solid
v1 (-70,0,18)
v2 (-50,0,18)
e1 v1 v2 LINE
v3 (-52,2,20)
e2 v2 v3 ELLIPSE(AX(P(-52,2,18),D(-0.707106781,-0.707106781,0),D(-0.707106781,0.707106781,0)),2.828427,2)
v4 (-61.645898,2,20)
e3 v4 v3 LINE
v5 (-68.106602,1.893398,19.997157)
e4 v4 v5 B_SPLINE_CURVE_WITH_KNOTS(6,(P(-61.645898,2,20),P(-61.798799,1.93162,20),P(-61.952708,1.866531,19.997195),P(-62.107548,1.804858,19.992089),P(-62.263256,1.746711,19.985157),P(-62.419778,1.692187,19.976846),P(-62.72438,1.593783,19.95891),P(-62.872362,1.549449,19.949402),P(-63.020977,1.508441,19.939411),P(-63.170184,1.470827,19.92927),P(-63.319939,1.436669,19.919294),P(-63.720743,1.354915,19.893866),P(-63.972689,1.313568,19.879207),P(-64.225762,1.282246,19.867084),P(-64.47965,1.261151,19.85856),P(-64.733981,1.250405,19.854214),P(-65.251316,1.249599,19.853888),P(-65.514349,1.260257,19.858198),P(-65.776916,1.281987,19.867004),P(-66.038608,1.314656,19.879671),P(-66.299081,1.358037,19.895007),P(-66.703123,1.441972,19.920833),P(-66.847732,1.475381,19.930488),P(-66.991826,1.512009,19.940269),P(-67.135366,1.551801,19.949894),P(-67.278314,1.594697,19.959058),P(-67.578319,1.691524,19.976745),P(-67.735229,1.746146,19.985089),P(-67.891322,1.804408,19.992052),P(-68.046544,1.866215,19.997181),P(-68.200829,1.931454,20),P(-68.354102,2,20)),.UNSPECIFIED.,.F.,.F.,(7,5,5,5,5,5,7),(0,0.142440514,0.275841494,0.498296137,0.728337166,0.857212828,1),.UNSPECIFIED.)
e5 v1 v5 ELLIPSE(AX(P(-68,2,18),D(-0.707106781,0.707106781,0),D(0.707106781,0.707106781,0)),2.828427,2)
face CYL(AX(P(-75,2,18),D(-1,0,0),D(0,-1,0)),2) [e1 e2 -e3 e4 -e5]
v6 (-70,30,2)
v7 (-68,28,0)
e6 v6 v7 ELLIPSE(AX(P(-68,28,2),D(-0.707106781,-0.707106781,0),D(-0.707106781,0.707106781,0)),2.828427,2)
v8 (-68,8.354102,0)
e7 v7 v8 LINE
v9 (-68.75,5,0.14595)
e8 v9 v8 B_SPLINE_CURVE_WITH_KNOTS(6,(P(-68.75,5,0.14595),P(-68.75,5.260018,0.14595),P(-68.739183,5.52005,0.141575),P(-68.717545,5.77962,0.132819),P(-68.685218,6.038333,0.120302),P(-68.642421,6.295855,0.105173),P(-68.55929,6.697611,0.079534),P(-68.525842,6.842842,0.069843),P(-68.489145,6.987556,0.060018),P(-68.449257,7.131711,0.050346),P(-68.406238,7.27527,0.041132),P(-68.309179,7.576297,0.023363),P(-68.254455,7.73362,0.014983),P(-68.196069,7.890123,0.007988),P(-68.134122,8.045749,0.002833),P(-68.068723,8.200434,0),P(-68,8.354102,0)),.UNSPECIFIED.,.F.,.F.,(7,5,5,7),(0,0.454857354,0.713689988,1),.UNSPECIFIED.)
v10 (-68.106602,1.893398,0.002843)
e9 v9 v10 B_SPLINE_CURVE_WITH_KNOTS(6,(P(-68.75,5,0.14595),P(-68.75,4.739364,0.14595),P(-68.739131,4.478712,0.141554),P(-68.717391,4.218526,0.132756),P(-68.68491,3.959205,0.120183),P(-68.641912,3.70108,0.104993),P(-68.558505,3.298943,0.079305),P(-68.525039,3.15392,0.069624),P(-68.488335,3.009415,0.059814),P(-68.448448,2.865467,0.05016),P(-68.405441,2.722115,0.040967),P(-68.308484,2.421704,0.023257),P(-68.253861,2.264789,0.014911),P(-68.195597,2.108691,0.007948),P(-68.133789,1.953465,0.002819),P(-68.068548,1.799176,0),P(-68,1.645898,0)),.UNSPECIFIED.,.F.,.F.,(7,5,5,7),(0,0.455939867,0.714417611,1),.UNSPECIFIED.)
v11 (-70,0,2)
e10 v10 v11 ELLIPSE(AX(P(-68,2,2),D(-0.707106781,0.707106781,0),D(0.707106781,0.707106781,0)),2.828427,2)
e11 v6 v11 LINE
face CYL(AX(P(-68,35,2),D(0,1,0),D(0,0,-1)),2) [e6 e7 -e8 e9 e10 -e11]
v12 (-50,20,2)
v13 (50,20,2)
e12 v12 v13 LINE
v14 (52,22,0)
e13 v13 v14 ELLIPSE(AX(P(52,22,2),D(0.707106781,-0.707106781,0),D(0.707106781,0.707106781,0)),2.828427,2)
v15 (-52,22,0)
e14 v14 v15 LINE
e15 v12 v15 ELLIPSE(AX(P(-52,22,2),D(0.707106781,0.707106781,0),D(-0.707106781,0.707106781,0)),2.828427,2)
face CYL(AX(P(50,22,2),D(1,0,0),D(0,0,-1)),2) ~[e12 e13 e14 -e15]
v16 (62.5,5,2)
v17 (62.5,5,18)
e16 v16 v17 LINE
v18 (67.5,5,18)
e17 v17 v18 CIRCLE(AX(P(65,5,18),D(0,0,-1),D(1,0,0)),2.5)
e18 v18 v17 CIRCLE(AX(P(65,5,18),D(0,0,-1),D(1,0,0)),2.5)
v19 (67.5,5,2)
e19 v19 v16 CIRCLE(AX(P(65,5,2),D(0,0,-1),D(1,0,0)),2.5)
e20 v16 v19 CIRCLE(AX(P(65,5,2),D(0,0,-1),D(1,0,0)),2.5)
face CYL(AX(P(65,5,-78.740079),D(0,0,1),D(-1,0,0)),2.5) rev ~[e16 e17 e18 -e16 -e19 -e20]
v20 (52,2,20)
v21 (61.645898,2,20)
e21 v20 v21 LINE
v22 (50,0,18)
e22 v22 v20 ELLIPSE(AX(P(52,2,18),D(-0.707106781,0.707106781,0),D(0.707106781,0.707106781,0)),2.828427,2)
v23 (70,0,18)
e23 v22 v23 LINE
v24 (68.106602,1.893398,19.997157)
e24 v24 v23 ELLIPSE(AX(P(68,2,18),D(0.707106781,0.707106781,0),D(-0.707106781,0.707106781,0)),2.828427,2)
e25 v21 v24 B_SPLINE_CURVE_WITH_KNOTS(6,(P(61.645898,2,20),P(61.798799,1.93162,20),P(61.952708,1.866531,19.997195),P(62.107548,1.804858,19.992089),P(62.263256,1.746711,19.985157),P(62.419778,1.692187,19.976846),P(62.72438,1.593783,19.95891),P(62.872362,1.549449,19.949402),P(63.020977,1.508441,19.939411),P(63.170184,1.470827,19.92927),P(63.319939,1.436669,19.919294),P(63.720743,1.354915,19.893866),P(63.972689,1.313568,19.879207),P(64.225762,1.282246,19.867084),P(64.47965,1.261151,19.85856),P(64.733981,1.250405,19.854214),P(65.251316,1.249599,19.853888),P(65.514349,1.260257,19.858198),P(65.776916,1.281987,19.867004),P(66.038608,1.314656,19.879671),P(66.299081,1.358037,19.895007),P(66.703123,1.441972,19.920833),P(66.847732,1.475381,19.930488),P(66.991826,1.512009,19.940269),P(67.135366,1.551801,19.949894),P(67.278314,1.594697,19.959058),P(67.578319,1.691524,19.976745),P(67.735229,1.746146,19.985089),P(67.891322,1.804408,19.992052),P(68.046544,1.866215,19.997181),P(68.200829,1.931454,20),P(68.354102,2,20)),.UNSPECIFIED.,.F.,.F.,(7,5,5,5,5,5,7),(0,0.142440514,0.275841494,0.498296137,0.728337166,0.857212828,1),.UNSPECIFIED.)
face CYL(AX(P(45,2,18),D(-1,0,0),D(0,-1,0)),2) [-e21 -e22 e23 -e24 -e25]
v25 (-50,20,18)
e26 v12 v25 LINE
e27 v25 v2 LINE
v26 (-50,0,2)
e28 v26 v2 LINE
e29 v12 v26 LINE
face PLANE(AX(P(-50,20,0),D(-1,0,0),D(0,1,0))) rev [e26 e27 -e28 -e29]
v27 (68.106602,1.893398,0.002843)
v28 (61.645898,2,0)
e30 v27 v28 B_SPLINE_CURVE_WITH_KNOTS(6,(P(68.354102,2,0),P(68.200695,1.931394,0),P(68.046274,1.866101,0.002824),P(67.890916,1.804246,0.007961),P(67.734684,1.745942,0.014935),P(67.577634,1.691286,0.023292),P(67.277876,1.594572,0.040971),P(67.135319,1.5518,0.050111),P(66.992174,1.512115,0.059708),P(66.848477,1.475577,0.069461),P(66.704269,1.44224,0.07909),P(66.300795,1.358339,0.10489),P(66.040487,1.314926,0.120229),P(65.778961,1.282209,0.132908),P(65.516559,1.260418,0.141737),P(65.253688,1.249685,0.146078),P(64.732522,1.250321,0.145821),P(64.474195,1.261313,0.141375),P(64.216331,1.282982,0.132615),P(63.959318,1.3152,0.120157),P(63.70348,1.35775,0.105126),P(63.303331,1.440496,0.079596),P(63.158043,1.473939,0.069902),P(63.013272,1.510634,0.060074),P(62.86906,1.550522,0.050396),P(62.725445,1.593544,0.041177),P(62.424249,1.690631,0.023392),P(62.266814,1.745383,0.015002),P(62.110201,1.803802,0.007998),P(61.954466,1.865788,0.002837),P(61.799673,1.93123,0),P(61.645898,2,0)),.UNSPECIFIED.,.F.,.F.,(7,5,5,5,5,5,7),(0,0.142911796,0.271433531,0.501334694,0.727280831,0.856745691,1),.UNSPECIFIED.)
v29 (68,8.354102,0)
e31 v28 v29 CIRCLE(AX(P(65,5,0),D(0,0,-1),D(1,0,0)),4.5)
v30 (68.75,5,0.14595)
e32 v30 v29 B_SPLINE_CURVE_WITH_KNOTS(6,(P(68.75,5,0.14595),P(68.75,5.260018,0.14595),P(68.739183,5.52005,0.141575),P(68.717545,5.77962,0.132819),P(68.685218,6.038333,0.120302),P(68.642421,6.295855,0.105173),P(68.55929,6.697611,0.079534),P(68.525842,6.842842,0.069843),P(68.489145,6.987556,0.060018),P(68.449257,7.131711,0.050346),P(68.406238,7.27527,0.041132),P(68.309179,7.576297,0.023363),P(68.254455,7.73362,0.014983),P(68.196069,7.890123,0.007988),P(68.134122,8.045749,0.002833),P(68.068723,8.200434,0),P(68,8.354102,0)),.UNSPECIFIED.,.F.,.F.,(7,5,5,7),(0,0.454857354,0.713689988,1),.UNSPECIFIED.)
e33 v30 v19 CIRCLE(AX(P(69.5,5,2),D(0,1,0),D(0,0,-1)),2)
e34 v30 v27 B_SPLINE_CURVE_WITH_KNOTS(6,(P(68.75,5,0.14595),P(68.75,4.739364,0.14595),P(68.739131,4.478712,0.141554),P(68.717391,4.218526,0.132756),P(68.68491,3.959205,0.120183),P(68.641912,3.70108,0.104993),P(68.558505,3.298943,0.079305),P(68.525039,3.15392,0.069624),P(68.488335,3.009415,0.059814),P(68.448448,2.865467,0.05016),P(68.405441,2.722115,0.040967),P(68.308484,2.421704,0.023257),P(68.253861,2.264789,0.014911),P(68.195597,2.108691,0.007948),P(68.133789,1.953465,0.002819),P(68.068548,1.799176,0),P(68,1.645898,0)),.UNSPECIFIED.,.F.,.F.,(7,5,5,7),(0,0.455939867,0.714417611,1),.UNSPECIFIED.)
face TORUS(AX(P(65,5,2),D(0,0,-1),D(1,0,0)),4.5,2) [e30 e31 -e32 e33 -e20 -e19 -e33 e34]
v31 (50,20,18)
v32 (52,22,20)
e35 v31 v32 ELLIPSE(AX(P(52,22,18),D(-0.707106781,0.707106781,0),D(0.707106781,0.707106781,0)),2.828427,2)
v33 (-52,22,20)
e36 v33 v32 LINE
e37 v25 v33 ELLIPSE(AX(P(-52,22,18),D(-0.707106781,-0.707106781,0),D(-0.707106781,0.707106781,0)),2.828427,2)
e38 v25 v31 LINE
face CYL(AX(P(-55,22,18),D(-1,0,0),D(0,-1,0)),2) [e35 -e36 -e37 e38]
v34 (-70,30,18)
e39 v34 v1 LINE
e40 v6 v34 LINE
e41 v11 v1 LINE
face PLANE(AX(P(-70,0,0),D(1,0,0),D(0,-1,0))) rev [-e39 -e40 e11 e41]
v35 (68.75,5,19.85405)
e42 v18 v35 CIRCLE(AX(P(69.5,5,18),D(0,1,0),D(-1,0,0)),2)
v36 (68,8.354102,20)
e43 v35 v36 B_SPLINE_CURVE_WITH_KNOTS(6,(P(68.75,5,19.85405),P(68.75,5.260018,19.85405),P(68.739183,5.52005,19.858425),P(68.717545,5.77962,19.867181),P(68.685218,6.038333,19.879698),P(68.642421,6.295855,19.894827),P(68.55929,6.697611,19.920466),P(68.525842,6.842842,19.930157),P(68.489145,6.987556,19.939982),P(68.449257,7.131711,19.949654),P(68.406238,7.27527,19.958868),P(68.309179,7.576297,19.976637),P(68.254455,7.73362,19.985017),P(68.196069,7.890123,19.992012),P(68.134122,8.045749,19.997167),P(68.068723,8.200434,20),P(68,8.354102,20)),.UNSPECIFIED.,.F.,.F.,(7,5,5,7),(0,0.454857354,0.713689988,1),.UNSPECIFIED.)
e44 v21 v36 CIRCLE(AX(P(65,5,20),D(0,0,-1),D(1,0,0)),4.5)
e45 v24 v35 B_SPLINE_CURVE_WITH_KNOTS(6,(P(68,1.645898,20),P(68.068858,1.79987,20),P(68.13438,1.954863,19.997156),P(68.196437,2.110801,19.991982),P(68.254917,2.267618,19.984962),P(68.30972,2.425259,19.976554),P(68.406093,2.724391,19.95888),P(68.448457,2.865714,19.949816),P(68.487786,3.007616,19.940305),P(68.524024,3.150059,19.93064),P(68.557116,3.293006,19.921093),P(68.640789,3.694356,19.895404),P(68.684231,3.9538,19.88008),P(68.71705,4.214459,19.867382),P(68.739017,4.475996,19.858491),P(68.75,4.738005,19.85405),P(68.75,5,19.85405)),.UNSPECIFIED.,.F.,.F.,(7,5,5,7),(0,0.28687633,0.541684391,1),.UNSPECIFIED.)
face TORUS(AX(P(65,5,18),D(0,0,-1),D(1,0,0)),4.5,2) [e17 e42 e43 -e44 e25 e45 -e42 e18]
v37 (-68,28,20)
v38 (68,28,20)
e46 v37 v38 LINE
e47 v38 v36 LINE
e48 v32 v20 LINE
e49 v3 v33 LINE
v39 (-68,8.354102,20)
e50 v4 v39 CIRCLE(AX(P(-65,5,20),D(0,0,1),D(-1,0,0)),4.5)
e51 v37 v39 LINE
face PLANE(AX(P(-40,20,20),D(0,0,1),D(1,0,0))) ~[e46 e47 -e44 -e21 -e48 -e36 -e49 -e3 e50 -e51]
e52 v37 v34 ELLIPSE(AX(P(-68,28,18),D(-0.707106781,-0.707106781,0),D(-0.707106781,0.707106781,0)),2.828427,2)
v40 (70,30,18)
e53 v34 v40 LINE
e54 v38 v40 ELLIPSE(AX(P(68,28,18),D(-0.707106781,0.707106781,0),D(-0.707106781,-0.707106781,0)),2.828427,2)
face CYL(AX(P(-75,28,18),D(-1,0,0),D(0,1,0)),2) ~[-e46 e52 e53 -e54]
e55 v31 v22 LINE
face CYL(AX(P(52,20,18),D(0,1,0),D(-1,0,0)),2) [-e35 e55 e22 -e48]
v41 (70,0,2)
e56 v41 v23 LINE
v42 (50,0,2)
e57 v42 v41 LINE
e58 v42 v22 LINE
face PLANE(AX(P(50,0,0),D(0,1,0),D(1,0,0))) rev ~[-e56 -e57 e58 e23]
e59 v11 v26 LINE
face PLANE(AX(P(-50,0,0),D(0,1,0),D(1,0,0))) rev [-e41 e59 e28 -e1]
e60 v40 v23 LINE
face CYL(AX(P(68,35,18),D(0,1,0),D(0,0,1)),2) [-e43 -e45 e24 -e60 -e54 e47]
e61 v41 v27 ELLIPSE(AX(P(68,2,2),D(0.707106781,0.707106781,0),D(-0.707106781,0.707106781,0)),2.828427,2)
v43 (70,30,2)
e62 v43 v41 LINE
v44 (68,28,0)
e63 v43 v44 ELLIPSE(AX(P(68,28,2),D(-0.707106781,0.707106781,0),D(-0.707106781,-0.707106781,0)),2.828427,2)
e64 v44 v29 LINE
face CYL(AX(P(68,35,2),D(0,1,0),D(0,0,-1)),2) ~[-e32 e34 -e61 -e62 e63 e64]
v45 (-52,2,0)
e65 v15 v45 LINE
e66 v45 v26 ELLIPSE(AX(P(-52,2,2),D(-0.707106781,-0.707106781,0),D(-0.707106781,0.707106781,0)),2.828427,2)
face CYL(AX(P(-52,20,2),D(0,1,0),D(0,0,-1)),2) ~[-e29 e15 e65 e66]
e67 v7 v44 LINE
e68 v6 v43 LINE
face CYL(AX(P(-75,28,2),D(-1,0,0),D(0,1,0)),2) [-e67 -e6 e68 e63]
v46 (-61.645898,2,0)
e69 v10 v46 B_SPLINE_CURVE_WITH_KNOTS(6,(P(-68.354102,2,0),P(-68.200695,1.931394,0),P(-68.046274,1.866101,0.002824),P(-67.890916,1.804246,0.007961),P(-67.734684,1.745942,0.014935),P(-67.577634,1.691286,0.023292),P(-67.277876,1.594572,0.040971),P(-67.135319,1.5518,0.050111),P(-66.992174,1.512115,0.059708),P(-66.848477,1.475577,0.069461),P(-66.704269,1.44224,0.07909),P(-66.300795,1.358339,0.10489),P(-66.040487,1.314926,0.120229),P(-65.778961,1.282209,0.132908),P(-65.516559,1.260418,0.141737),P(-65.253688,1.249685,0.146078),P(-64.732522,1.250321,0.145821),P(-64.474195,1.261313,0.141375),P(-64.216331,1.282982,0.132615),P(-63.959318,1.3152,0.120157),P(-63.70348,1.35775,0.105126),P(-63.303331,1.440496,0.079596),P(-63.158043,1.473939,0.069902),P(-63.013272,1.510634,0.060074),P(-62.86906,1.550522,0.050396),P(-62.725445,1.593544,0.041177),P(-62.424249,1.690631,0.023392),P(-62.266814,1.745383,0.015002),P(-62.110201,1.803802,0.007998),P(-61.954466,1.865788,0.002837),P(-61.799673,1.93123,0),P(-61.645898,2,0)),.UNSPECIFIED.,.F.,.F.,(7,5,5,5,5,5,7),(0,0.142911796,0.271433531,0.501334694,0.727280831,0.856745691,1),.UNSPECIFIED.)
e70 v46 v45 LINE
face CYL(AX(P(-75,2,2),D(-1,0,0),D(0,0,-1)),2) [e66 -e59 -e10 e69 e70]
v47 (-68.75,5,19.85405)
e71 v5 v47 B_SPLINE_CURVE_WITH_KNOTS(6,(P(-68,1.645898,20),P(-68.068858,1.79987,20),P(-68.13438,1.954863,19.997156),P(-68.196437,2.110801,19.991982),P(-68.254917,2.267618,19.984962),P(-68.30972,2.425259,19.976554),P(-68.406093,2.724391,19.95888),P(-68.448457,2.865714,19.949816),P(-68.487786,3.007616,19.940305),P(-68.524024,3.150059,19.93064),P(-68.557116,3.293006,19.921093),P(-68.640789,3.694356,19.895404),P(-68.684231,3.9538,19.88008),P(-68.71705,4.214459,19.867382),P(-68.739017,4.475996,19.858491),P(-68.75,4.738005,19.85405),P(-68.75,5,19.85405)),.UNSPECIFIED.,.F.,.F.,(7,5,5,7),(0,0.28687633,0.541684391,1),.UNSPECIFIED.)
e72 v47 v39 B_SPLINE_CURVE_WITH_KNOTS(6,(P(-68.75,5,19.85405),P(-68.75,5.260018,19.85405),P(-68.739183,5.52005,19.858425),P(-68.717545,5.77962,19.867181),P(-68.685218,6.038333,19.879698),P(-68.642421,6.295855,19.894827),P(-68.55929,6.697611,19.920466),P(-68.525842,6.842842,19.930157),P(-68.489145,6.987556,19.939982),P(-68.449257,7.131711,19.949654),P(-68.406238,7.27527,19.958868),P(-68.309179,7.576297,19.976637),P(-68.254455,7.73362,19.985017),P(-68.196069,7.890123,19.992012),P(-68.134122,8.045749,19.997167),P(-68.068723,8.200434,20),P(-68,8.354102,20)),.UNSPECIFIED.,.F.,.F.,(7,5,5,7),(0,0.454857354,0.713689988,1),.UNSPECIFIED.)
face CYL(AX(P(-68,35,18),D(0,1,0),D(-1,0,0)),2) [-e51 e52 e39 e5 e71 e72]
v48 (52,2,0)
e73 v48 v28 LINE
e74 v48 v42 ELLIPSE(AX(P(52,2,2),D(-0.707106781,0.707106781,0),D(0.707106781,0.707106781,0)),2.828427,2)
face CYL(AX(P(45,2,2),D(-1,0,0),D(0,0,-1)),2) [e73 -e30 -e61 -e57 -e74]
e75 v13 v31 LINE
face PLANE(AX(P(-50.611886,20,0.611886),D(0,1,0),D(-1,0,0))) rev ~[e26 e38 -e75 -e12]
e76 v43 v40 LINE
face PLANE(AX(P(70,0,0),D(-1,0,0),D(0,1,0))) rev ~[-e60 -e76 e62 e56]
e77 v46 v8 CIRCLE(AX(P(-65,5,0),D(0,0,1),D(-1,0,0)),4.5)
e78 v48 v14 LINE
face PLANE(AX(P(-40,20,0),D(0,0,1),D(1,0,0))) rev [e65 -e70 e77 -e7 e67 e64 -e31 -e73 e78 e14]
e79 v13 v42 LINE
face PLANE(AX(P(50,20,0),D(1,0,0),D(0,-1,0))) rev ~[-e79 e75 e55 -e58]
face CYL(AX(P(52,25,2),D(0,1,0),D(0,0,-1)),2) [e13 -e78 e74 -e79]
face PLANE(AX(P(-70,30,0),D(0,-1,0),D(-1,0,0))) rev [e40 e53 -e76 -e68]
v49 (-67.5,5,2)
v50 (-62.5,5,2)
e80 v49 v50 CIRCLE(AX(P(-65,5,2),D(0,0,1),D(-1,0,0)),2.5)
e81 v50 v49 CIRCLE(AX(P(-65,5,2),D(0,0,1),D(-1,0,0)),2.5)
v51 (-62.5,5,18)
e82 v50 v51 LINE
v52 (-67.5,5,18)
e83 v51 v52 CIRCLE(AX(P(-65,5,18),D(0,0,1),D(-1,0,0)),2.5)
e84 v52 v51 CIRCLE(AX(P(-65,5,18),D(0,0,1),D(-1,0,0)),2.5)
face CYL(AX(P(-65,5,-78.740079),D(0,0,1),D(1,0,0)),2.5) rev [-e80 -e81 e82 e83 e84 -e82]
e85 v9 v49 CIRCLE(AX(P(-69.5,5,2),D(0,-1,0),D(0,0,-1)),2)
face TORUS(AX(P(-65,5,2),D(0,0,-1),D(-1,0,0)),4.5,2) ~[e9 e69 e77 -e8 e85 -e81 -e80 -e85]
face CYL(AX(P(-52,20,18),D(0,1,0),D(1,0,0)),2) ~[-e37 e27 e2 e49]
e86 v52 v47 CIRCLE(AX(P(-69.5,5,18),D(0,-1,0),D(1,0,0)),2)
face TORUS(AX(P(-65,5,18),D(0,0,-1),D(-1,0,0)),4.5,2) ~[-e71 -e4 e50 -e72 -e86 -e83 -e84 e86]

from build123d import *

# Parameters (mm, degrees)
F1_DEPTH     = 20
F3_D         = 5
F5_T1_DEPTH  = 150
F5_T3_DEPTH  = 40
F5_T5_DEPTH  = 30
F5_T7_DEPTH  = 25
F5_T9_DEPTH  = 100
F5_T11_DEPTH = 30
F5_T25_DEPTH = 105
F5_T29_DEPTH = 30
F5_T36_DEPTH = 30
F5_T40_DEPTH = 105
F5_T47_DEPTH = 30
F5_T51_DEPTH = 105
F5_T58_DEPTH = 105
F5_T62_DEPTH = 30


# Not quite as in the source:
# - a fillet or chamfer that OpenCascade refuses, or shapes differently, is made with other operations: its cross-section is extruded or revolved along the edge and cut away or added


with BuildPart() as f1:
    # F0 (on Top) → F1 (new body)
    with BuildSketch(Plane.XY):
        Polygon((70, 30), (0, 30), (0, 20), (50, 20), (50, 0), (70, 0), align=None)
    extrude(amount=F1_DEPTH)

    # F3 (through all)
    with Locations(Plane(origin=(0, 0, 0), x_dir=(1, 0, 0), z_dir=(0, 0, -1))):
        with Locations((65, -5)):
            Hole(F3_D / 2)

    # F4: F1 across plane


with BuildPart() as f1_1:
    add(f1.part)
    add(f1.part.mirror(Plane.YZ))

    # F5: fillet of radius 2 on 20 edges, made by hand

    # F5_s2 → F5_t1 (cut)
    with BuildSketch(Plane.YZ.offset(-75)):
        with BuildLine():
            ThreePointArc((30, 18), (29.4142135624, 19.4142135624), (28, 20))
            Line((28, 20), (30, 20))
            Line((30, 20), (30, 18))
        make_face()
        with BuildLine():
            ThreePointArc((30, 2), (29.4142135624, 0.5857864376), (28, 0))
            Line((28, 0), (30, 0))
            Line((30, 0), (30, 2))
        make_face()
    extrude(amount=F5_T1_DEPTH, mode=Mode.SUBTRACT)

    # F5_s4 → F5_t3 (cut)
    with BuildSketch(Plane.XZ.offset(-35)):
        with BuildLine():
            ThreePointArc((-70, 18), (-69.4142135624, 19.4142135624), (-68, 20))
            Line((-68, 20), (-70, 20))
            Line((-70, 20), (-70, 18))
        make_face()
        with BuildLine():
            ThreePointArc((68, 20), (69.4142135624, 19.4142135624), (70, 18))
            Line((70, 18), (70, 20))
            Line((70, 20), (68, 20))
        make_face()
        with BuildLine():
            ThreePointArc((-68, 0), (-69.4142135624, 0.5857864376), (-70, 2))
            Line((-70, 2), (-70, 0))
            Line((-70, 0), (-68, 0))
        make_face()
        with BuildLine():
            ThreePointArc((68, 0), (69.4142135624, 0.5857864376), (70, 2))
            Line((70, 2), (70, 0))
            Line((70, 0), (68, 0))
        make_face()
    extrude(amount=F5_T3_DEPTH, mode=Mode.SUBTRACT)

    # F5_s6 → F5_t5 (cut)
    with BuildSketch(Plane.YZ.offset(-75)):
        with BuildLine():
            ThreePointArc((0, 18), (0.5857864376, 19.4142135624), (2, 20))
            Line((2, 20), (0, 20))
            Line((0, 20), (0, 18))
        make_face()
        with BuildLine():
            ThreePointArc((2, 0), (0.5857864376, 0.5857864376), (0, 2))
            Line((0, 2), (0, 0))
            Line((0, 0), (2, 0))
        make_face()
    extrude(amount=F5_T5_DEPTH, mode=Mode.SUBTRACT)

    # F5_s8 → F5_t7 (cut)
    with BuildSketch(Plane.XZ.offset(-20)):
        with BuildLine():
            ThreePointArc((-50, 18), (-50.5857864376, 19.4142135624), (-52, 20))
            Line((-52, 20), (-50, 20))
            Line((-50, 20), (-50, 18))
        make_face()
        with BuildLine():
            ThreePointArc((50, 18), (50.5857864376, 19.4142135624), (52, 20))
            Line((52, 20), (50, 20))
            Line((50, 20), (50, 18))
        make_face()
        with BuildLine():
            ThreePointArc((-52, 0), (-50.5857864376, 0.5857864376), (-50, 2))
            Line((-50, 2), (-50, 0))
            Line((-50, 0), (-52, 0))
        make_face()
        with BuildLine():
            ThreePointArc((52, 0), (50.5857864376, 0.5857864376), (50, 2))
            Line((50, 2), (50, 0))
            Line((50, 0), (52, 0))
        make_face()
    extrude(amount=F5_T7_DEPTH, mode=Mode.SUBTRACT)

    # F5_s10 → F5_t9 (cut)
    with BuildSketch(Plane.YZ.offset(-50)):
        with BuildLine():
            ThreePointArc((20, 18), (20.5857864376, 19.4142135624), (22, 20))
            Line((22, 20), (20, 20))
            Line((20, 20), (20, 18))
        make_face()
        with BuildLine():
            ThreePointArc((22, 0), (20.5857864376, 0.5857864376), (20, 2))
            Line((20, 2), (20, 0))
            Line((20, 0), (22, 0))
        make_face()
    extrude(amount=F5_T9_DEPTH, mode=Mode.SUBTRACT)

    # F5_s12 → F5_t11 (cut)
    with BuildSketch(Plane.YZ.offset(45)):
        with BuildLine():
            ThreePointArc((0, 18), (0.5857864376, 19.4142135624), (2, 20))
            Line((2, 20), (0, 20))
            Line((0, 20), (0, 18))
        make_face()
        with BuildLine():
            ThreePointArc((2, 0), (0.5857864376, 0.5857864376), (0, 2))
            Line((0, 2), (0, 0))
            Line((0, 0), (2, 0))
        make_face()
    extrude(amount=F5_T11_DEPTH, mode=Mode.SUBTRACT)

    # F5_s13 → F5_t14 (revolve, cut)
    with BuildSketch(Plane.XZ.offset(-5)):
        with BuildLine():
            ThreePointArc((67.5, 18), (68.0857864376, 19.4142135624), (69.5, 20))
            Line((69.5, 20), (67.5, 20))
            Line((67.5, 20), (67.5, 18))
        make_face()
    revolve(axis=Axis((65, 5, 20), (0, 0, -1)), mode=Mode.SUBTRACT)

    # F5_s15 → F5_t16 (revolve, cut)
    with BuildSketch(Plane.XZ.offset(-5)):
        with BuildLine():
            ThreePointArc((-67.5, 18), (-68.0857864376, 19.4142135624), (-69.5, 20))
            Line((-69.5, 20), (-67.5, 20))
            Line((-67.5, 20), (-67.5, 18))
        make_face()
    revolve(axis=Axis((-65, 5, 20), (0, 0, 1)), mode=Mode.SUBTRACT)

    # F5_s17 → F5_t18 (revolve, cut)
    with BuildSketch(Plane.XZ.offset(-5)):
        with BuildLine():
            ThreePointArc((69.5, 0), (68.0857864376, 0.5857864376), (67.5, 2))
            Line((67.5, 2), (67.5, 0))
            Line((67.5, 0), (69.5, 0))
        make_face()
    revolve(axis=Axis((65, 5, 0), (0, 0, -1)), mode=Mode.SUBTRACT)

    # F5_s19 → F5_t20 (revolve, cut)
    with BuildSketch(Plane.XZ.offset(-5)):
        with BuildLine():
            ThreePointArc((-69.5, 0), (-68.0857864376, 0.5857864376), (-67.5, 2))
            Line((-67.5, 2), (-67.5, 0))
            Line((-67.5, 0), (-69.5, 0))
        make_face()
    revolve(axis=Axis((-65, 5, 0), (0, 0, 1)), mode=Mode.SUBTRACT)


with BuildPart() as f5_tool23:
    # F5_s24 → F5_t25 (new body)
    with BuildSketch(Plane.YZ.offset(-55)):
        with BuildLine():
            ThreePointArc((20, 18), (20.5857864376, 19.4142135624), (22, 20))
            Line((22, 20), (20, 20))
            Line((20, 20), (20, 18))
        make_face()
    extrude(amount=F5_T25_DEPTH)

    split(bisect_by=Plane.YZ.offset(-50), keep=Keep.BOTTOM)


with BuildPart() as f5_tool27:
    # F5_s28 → F5_t29 (new body)
    with BuildSketch(Plane.XZ.offset(-25)):
        with BuildLine():
            ThreePointArc((-50, 18), (-50.5857864376, 19.4142135624), (-52, 20))
            Line((-52, 20), (-50, 20))
            Line((-50, 20), (-50, 18))
        make_face()
    extrude(amount=F5_T29_DEPTH)

    split(bisect_by=Plane.XZ.offset(-20), keep=Keep.BOTTOM)


with BuildPart() as f5_tool23_1:
    add(f5_tool23.part)

    # F5_t31: intersect F5_tool27
    add(f5_tool27.part, mode=Mode.INTERSECT)


with BuildPart() as f1_2:
    add(f1_1.part)

    # F5_t21: cut F5_tool23
    add(f5_tool23_1.part, mode=Mode.SUBTRACT)


with BuildPart() as f5_tool34:
    # F5_s35 → F5_t36 (new body)
    with BuildSketch(Plane.XZ.offset(-25)):
        with BuildLine():
            ThreePointArc((50, 18), (50.5857864376, 19.4142135624), (52, 20))
            Line((52, 20), (50, 20))
            Line((50, 20), (50, 18))
        make_face()
    extrude(amount=F5_T36_DEPTH)

    split(bisect_by=Plane.XZ.offset(-20), keep=Keep.BOTTOM)


with BuildPart() as f5_tool38:
    # F5_s39 → F5_t40 (new body)
    with BuildSketch(Plane.YZ.offset(-50)):
        with BuildLine():
            ThreePointArc((20, 18), (20.5857864376, 19.4142135624), (22, 20))
            Line((22, 20), (20, 20))
            Line((20, 20), (20, 18))
        make_face()
    extrude(amount=F5_T40_DEPTH)

    split(bisect_by=Plane.YZ.offset(50), keep=Keep.TOP)


with BuildPart() as f5_tool34_1:
    add(f5_tool34.part)

    # F5_t42: intersect F5_tool38
    add(f5_tool38.part, mode=Mode.INTERSECT)


with BuildPart() as f1_3:
    add(f1_2.part)

    # F5_t32: cut F5_tool34
    add(f5_tool34_1.part, mode=Mode.SUBTRACT)


with BuildPart() as f5_tool45:
    # F5_s46 → F5_t47 (new body)
    with BuildSketch(Plane.XZ.offset(-25)):
        with BuildLine():
            ThreePointArc((-52, 0), (-50.5857864376, 0.5857864376), (-50, 2))
            Line((-50, 2), (-50, 0))
            Line((-50, 0), (-52, 0))
        make_face()
    extrude(amount=F5_T47_DEPTH)

    split(bisect_by=Plane.XZ.offset(-20), keep=Keep.BOTTOM)


with BuildPart() as f5_tool49:
    # F5_s50 → F5_t51 (new body)
    with BuildSketch(Plane.YZ.offset(50)):
        with BuildLine():
            ThreePointArc((22, 0), (20.5857864376, 0.5857864376), (20, 2))
            Line((20, 2), (20, 0))
            Line((20, 0), (22, 0))
        make_face()
    extrude(amount=-F5_T51_DEPTH)

    split(bisect_by=Plane.YZ.offset(-50), keep=Keep.BOTTOM)


with BuildPart() as f5_tool45_1:
    add(f5_tool45.part)

    # F5_t53: intersect F5_tool49
    add(f5_tool49.part, mode=Mode.INTERSECT)


with BuildPart() as f1_4:
    add(f1_3.part)

    # F5_t43: cut F5_tool45
    add(f5_tool45_1.part, mode=Mode.SUBTRACT)


with BuildPart() as f5_tool56:
    # F5_s57 → F5_t58 (new body)
    with BuildSketch(Plane.YZ.offset(55)):
        with BuildLine():
            ThreePointArc((22, 0), (20.5857864376, 0.5857864376), (20, 2))
            Line((20, 2), (20, 0))
            Line((20, 0), (22, 0))
        make_face()
    extrude(amount=-F5_T58_DEPTH)

    split(bisect_by=Plane.YZ.offset(50), keep=Keep.TOP)


with BuildPart() as f5_tool60:
    # F5_s61 → F5_t62 (new body)
    with BuildSketch(Plane.XZ.offset(-25)):
        with BuildLine():
            ThreePointArc((52, 0), (50.5857864376, 0.5857864376), (50, 2))
            Line((50, 2), (50, 0))
            Line((50, 0), (52, 0))
        make_face()
    extrude(amount=F5_T62_DEPTH)

    split(bisect_by=Plane.XZ.offset(-20), keep=Keep.BOTTOM)


with BuildPart() as f5_tool56_1:
    add(f5_tool56.part)

    # F5_t64: intersect F5_tool60
    add(f5_tool60.part, mode=Mode.INTERSECT)


with BuildPart() as f1_5:
    add(f1_4.part)

    # F5_t54: cut F5_tool56
    add(f5_tool56_1.part, mode=Mode.SUBTRACT)


solid = f1_5.part
